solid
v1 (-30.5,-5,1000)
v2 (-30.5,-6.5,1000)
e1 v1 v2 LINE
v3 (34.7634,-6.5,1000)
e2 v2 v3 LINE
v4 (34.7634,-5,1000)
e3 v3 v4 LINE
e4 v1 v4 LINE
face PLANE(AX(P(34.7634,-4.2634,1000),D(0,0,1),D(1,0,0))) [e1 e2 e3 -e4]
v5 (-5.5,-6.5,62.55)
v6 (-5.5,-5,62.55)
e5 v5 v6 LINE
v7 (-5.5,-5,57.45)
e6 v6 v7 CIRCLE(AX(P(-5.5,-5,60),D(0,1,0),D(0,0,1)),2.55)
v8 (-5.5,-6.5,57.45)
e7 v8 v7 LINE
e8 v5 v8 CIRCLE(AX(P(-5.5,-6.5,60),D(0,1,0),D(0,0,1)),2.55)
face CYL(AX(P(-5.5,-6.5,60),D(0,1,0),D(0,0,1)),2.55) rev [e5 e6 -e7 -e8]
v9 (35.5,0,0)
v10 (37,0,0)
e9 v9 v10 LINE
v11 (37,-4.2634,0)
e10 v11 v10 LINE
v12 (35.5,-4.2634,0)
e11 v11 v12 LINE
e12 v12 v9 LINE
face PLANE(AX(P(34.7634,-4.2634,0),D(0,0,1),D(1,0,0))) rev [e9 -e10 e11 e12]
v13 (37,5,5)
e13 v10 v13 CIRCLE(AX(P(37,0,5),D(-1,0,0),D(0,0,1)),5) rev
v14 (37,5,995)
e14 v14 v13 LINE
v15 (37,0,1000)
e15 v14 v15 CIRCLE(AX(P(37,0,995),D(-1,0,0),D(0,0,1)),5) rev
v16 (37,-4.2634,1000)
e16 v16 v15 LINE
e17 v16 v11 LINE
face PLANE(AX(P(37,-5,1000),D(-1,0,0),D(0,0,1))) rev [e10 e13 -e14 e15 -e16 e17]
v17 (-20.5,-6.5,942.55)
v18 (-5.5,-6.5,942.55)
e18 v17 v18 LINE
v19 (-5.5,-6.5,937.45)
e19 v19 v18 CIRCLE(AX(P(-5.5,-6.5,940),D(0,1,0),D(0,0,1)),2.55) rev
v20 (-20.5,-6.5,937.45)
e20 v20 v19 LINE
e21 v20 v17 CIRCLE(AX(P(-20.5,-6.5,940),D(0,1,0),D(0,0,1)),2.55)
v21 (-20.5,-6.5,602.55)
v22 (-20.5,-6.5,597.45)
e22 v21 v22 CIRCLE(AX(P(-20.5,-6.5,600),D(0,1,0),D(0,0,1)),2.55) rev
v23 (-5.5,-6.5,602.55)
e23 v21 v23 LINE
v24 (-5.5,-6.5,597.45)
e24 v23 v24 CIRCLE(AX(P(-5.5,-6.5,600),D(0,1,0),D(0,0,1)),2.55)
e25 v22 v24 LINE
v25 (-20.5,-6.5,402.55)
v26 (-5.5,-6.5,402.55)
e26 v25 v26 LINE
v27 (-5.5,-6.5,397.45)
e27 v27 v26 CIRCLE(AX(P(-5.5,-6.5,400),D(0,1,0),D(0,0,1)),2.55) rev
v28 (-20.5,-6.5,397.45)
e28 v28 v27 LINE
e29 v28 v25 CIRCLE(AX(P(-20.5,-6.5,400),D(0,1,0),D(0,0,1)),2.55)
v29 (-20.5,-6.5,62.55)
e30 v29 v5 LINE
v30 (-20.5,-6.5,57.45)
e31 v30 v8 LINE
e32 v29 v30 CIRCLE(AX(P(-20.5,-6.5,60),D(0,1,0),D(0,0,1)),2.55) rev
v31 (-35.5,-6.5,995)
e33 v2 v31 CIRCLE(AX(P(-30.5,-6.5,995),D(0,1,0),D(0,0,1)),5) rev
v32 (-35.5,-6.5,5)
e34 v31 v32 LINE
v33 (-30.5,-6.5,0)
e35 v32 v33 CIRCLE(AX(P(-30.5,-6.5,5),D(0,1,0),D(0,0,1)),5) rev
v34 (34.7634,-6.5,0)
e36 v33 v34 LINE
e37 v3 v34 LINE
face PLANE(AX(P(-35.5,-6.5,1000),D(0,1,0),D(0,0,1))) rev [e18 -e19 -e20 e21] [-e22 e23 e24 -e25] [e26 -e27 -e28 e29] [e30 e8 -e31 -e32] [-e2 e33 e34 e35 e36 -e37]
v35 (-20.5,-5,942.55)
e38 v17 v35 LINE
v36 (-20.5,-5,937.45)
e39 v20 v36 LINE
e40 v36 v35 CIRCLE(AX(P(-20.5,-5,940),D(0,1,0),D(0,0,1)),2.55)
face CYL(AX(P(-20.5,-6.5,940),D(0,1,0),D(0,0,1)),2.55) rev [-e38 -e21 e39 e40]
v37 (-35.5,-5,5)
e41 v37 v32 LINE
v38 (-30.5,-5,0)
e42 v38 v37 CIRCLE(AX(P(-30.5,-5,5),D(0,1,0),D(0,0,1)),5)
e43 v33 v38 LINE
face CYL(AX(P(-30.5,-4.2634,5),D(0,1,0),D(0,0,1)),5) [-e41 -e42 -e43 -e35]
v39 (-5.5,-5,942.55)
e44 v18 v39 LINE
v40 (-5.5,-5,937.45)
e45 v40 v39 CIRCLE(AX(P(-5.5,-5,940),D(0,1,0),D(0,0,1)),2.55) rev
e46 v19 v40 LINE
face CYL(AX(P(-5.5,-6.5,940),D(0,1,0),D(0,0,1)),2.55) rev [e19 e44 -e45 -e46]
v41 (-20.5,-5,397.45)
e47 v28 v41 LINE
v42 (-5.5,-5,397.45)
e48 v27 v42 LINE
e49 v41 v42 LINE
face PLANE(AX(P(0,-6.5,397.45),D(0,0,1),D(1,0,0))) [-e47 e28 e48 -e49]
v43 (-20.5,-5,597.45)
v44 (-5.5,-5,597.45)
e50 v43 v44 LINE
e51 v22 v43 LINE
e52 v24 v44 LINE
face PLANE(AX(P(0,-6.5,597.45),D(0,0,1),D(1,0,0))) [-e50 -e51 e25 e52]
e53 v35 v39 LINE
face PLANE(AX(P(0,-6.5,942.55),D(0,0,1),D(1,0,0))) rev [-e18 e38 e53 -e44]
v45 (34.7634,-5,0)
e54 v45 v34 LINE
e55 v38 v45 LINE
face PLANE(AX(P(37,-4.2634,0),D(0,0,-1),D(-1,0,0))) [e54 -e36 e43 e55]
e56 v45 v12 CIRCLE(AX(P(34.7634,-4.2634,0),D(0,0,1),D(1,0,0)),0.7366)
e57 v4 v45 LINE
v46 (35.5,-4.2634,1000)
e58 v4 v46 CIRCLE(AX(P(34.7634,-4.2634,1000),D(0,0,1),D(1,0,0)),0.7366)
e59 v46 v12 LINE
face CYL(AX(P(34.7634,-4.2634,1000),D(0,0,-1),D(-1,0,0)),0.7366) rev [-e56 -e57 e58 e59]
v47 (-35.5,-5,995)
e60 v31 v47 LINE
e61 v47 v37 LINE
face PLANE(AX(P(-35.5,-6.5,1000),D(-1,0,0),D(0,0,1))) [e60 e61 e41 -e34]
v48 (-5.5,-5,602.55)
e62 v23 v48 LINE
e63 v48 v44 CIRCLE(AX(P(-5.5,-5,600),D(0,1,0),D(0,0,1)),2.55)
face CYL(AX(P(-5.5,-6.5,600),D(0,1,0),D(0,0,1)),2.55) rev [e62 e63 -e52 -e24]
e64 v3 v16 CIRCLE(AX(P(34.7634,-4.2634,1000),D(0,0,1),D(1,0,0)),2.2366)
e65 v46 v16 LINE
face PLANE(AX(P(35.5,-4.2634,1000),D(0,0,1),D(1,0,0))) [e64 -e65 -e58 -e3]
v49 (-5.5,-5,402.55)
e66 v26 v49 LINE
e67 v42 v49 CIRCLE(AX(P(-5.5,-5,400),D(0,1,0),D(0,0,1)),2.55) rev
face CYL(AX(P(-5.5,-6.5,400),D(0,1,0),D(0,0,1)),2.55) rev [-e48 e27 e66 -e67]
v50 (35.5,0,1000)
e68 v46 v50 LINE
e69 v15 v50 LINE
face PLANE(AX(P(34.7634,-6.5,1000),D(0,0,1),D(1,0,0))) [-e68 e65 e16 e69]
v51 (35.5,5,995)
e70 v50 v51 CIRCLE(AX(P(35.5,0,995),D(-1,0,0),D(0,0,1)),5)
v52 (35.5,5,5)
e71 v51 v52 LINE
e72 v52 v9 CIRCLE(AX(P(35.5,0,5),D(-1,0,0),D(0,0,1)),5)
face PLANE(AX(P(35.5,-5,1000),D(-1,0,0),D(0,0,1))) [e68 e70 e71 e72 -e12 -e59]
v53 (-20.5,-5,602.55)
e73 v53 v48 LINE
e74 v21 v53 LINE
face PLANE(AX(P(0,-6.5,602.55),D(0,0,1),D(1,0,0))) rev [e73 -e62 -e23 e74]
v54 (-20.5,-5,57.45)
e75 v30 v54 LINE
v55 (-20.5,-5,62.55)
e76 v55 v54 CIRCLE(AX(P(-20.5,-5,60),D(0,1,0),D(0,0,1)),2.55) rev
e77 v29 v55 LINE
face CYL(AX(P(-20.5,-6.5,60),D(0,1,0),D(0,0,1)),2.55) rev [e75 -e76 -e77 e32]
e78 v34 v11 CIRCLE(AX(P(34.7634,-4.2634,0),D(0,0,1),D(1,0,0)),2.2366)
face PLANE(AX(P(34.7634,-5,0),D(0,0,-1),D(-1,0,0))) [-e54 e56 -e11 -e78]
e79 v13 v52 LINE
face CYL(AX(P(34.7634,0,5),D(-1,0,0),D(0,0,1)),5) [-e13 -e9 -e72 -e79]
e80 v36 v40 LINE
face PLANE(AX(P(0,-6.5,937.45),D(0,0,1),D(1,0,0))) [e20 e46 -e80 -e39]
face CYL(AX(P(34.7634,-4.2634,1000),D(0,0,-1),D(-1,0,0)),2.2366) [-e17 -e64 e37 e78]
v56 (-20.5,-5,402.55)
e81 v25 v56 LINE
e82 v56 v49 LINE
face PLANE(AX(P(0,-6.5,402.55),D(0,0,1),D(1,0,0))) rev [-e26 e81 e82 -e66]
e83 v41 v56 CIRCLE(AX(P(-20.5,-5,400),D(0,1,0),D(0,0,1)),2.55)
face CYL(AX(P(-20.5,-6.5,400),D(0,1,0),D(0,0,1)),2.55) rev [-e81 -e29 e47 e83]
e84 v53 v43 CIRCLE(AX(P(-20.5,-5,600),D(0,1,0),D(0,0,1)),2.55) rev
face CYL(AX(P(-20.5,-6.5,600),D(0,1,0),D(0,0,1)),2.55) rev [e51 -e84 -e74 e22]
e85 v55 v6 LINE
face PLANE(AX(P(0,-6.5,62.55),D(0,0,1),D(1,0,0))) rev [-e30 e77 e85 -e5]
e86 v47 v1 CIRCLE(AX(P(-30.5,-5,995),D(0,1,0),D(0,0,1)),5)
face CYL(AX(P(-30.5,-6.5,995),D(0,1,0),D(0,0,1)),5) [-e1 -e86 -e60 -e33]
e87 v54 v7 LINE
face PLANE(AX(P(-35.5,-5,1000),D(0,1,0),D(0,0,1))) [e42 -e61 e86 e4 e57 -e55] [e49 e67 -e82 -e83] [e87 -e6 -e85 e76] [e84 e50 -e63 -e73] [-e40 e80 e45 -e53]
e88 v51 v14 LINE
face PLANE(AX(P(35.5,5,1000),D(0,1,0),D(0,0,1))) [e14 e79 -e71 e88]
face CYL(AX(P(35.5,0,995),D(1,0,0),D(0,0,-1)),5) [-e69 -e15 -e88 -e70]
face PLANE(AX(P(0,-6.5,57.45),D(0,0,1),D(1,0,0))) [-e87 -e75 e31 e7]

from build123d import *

# Parameters (mm, degrees)
BASE_FLANGE1_DEPTH = 1000
CUT_EXTRUDE2_DEPTH = 1001.734230453
FILLET1_R          = 5


# Sheet-metal steps are written as plain solids
with BuildPart() as part:
    # Sketch1 → Base-Flange1 (new body)
    with BuildSketch(Plane.XY):
        with BuildLine():
            Line((-35.5, -5), (34.7634, -5))
            ThreePointArc((34.7634, -5), (35.284254855, -4.784254855), (35.5, -4.2634))
            Line((35.5, -4.2634), (35.5, 5))
            Line((35.5, 5), (37, 5))
            Line((37, 5), (37, -4.2634))
            ThreePointArc((37, -4.2634), (36.344915027, -5.844915027), (34.7634, -6.5))
            Line((34.7634, -6.5), (-35.5, -6.5))
            Line((-35.5, -6.5), (-35.5, -5))
        make_face()
    extrude(amount=BASE_FLANGE1_DEPTH)

    # Sketch4 → Cut-Extrude2 (cut, through all)
    with BuildSketch(Plane(origin=(0, -5, 0), x_dir=(1, 0, 0), z_dir=(0, 1, 0))):
        with BuildLine():
            ThreePointArc((-20.5, -62.55), (-23.05, -60), (-20.5, -57.45))
            Line((-20.5, -57.45), (-5.5, -57.45))
            ThreePointArc((-5.5, -57.45), (-2.95, -60), (-5.5, -62.55))
            Line((-5.5, -62.55), (-20.5, -62.55))
        make_face()
        with BuildLine():
            ThreePointArc((-20.5, -602.55), (-23.05, -600), (-20.5, -597.45))
            Line((-20.5, -597.45), (-5.5, -597.45))
            ThreePointArc((-5.5, -597.45), (-2.95, -600), (-5.5, -602.55))
            Line((-5.5, -602.55), (-20.5, -602.55))
        make_face()
        with BuildLine():
            ThreePointArc((-5.5, -937.45), (-2.95, -940), (-5.5, -942.55))
            Line((-5.5, -942.55), (-20.5, -942.55))
            ThreePointArc((-20.5, -942.55), (-23.05, -940), (-20.5, -937.45))
            Line((-20.5, -937.45), (-5.5, -937.45))
        make_face()
        with BuildLine():
            ThreePointArc((-5.5, -397.45), (-2.95, -400), (-5.5, -402.55))
            Line((-5.5, -402.55), (-20.5, -402.55))
            ThreePointArc((-20.5, -402.55), (-23.05, -400), (-20.5, -397.45))
            Line((-20.5, -397.45), (-5.5, -397.45))
        make_face()
    extrude(amount=-CUT_EXTRUDE2_DEPTH, mode=Mode.SUBTRACT)

    # Fillet1
    fillet1_edges = [part.edges().sort_by_distance(p)[0] for p in [
        (-35.5, -5.75, 1000),
        (36.25, 5, 1000),
        (-35.5, -5.75, 0),
        (36.25, 5, 0),
    ]]
    fillet(fillet1_edges, radius=FILLET1_R)


solid = part.part
